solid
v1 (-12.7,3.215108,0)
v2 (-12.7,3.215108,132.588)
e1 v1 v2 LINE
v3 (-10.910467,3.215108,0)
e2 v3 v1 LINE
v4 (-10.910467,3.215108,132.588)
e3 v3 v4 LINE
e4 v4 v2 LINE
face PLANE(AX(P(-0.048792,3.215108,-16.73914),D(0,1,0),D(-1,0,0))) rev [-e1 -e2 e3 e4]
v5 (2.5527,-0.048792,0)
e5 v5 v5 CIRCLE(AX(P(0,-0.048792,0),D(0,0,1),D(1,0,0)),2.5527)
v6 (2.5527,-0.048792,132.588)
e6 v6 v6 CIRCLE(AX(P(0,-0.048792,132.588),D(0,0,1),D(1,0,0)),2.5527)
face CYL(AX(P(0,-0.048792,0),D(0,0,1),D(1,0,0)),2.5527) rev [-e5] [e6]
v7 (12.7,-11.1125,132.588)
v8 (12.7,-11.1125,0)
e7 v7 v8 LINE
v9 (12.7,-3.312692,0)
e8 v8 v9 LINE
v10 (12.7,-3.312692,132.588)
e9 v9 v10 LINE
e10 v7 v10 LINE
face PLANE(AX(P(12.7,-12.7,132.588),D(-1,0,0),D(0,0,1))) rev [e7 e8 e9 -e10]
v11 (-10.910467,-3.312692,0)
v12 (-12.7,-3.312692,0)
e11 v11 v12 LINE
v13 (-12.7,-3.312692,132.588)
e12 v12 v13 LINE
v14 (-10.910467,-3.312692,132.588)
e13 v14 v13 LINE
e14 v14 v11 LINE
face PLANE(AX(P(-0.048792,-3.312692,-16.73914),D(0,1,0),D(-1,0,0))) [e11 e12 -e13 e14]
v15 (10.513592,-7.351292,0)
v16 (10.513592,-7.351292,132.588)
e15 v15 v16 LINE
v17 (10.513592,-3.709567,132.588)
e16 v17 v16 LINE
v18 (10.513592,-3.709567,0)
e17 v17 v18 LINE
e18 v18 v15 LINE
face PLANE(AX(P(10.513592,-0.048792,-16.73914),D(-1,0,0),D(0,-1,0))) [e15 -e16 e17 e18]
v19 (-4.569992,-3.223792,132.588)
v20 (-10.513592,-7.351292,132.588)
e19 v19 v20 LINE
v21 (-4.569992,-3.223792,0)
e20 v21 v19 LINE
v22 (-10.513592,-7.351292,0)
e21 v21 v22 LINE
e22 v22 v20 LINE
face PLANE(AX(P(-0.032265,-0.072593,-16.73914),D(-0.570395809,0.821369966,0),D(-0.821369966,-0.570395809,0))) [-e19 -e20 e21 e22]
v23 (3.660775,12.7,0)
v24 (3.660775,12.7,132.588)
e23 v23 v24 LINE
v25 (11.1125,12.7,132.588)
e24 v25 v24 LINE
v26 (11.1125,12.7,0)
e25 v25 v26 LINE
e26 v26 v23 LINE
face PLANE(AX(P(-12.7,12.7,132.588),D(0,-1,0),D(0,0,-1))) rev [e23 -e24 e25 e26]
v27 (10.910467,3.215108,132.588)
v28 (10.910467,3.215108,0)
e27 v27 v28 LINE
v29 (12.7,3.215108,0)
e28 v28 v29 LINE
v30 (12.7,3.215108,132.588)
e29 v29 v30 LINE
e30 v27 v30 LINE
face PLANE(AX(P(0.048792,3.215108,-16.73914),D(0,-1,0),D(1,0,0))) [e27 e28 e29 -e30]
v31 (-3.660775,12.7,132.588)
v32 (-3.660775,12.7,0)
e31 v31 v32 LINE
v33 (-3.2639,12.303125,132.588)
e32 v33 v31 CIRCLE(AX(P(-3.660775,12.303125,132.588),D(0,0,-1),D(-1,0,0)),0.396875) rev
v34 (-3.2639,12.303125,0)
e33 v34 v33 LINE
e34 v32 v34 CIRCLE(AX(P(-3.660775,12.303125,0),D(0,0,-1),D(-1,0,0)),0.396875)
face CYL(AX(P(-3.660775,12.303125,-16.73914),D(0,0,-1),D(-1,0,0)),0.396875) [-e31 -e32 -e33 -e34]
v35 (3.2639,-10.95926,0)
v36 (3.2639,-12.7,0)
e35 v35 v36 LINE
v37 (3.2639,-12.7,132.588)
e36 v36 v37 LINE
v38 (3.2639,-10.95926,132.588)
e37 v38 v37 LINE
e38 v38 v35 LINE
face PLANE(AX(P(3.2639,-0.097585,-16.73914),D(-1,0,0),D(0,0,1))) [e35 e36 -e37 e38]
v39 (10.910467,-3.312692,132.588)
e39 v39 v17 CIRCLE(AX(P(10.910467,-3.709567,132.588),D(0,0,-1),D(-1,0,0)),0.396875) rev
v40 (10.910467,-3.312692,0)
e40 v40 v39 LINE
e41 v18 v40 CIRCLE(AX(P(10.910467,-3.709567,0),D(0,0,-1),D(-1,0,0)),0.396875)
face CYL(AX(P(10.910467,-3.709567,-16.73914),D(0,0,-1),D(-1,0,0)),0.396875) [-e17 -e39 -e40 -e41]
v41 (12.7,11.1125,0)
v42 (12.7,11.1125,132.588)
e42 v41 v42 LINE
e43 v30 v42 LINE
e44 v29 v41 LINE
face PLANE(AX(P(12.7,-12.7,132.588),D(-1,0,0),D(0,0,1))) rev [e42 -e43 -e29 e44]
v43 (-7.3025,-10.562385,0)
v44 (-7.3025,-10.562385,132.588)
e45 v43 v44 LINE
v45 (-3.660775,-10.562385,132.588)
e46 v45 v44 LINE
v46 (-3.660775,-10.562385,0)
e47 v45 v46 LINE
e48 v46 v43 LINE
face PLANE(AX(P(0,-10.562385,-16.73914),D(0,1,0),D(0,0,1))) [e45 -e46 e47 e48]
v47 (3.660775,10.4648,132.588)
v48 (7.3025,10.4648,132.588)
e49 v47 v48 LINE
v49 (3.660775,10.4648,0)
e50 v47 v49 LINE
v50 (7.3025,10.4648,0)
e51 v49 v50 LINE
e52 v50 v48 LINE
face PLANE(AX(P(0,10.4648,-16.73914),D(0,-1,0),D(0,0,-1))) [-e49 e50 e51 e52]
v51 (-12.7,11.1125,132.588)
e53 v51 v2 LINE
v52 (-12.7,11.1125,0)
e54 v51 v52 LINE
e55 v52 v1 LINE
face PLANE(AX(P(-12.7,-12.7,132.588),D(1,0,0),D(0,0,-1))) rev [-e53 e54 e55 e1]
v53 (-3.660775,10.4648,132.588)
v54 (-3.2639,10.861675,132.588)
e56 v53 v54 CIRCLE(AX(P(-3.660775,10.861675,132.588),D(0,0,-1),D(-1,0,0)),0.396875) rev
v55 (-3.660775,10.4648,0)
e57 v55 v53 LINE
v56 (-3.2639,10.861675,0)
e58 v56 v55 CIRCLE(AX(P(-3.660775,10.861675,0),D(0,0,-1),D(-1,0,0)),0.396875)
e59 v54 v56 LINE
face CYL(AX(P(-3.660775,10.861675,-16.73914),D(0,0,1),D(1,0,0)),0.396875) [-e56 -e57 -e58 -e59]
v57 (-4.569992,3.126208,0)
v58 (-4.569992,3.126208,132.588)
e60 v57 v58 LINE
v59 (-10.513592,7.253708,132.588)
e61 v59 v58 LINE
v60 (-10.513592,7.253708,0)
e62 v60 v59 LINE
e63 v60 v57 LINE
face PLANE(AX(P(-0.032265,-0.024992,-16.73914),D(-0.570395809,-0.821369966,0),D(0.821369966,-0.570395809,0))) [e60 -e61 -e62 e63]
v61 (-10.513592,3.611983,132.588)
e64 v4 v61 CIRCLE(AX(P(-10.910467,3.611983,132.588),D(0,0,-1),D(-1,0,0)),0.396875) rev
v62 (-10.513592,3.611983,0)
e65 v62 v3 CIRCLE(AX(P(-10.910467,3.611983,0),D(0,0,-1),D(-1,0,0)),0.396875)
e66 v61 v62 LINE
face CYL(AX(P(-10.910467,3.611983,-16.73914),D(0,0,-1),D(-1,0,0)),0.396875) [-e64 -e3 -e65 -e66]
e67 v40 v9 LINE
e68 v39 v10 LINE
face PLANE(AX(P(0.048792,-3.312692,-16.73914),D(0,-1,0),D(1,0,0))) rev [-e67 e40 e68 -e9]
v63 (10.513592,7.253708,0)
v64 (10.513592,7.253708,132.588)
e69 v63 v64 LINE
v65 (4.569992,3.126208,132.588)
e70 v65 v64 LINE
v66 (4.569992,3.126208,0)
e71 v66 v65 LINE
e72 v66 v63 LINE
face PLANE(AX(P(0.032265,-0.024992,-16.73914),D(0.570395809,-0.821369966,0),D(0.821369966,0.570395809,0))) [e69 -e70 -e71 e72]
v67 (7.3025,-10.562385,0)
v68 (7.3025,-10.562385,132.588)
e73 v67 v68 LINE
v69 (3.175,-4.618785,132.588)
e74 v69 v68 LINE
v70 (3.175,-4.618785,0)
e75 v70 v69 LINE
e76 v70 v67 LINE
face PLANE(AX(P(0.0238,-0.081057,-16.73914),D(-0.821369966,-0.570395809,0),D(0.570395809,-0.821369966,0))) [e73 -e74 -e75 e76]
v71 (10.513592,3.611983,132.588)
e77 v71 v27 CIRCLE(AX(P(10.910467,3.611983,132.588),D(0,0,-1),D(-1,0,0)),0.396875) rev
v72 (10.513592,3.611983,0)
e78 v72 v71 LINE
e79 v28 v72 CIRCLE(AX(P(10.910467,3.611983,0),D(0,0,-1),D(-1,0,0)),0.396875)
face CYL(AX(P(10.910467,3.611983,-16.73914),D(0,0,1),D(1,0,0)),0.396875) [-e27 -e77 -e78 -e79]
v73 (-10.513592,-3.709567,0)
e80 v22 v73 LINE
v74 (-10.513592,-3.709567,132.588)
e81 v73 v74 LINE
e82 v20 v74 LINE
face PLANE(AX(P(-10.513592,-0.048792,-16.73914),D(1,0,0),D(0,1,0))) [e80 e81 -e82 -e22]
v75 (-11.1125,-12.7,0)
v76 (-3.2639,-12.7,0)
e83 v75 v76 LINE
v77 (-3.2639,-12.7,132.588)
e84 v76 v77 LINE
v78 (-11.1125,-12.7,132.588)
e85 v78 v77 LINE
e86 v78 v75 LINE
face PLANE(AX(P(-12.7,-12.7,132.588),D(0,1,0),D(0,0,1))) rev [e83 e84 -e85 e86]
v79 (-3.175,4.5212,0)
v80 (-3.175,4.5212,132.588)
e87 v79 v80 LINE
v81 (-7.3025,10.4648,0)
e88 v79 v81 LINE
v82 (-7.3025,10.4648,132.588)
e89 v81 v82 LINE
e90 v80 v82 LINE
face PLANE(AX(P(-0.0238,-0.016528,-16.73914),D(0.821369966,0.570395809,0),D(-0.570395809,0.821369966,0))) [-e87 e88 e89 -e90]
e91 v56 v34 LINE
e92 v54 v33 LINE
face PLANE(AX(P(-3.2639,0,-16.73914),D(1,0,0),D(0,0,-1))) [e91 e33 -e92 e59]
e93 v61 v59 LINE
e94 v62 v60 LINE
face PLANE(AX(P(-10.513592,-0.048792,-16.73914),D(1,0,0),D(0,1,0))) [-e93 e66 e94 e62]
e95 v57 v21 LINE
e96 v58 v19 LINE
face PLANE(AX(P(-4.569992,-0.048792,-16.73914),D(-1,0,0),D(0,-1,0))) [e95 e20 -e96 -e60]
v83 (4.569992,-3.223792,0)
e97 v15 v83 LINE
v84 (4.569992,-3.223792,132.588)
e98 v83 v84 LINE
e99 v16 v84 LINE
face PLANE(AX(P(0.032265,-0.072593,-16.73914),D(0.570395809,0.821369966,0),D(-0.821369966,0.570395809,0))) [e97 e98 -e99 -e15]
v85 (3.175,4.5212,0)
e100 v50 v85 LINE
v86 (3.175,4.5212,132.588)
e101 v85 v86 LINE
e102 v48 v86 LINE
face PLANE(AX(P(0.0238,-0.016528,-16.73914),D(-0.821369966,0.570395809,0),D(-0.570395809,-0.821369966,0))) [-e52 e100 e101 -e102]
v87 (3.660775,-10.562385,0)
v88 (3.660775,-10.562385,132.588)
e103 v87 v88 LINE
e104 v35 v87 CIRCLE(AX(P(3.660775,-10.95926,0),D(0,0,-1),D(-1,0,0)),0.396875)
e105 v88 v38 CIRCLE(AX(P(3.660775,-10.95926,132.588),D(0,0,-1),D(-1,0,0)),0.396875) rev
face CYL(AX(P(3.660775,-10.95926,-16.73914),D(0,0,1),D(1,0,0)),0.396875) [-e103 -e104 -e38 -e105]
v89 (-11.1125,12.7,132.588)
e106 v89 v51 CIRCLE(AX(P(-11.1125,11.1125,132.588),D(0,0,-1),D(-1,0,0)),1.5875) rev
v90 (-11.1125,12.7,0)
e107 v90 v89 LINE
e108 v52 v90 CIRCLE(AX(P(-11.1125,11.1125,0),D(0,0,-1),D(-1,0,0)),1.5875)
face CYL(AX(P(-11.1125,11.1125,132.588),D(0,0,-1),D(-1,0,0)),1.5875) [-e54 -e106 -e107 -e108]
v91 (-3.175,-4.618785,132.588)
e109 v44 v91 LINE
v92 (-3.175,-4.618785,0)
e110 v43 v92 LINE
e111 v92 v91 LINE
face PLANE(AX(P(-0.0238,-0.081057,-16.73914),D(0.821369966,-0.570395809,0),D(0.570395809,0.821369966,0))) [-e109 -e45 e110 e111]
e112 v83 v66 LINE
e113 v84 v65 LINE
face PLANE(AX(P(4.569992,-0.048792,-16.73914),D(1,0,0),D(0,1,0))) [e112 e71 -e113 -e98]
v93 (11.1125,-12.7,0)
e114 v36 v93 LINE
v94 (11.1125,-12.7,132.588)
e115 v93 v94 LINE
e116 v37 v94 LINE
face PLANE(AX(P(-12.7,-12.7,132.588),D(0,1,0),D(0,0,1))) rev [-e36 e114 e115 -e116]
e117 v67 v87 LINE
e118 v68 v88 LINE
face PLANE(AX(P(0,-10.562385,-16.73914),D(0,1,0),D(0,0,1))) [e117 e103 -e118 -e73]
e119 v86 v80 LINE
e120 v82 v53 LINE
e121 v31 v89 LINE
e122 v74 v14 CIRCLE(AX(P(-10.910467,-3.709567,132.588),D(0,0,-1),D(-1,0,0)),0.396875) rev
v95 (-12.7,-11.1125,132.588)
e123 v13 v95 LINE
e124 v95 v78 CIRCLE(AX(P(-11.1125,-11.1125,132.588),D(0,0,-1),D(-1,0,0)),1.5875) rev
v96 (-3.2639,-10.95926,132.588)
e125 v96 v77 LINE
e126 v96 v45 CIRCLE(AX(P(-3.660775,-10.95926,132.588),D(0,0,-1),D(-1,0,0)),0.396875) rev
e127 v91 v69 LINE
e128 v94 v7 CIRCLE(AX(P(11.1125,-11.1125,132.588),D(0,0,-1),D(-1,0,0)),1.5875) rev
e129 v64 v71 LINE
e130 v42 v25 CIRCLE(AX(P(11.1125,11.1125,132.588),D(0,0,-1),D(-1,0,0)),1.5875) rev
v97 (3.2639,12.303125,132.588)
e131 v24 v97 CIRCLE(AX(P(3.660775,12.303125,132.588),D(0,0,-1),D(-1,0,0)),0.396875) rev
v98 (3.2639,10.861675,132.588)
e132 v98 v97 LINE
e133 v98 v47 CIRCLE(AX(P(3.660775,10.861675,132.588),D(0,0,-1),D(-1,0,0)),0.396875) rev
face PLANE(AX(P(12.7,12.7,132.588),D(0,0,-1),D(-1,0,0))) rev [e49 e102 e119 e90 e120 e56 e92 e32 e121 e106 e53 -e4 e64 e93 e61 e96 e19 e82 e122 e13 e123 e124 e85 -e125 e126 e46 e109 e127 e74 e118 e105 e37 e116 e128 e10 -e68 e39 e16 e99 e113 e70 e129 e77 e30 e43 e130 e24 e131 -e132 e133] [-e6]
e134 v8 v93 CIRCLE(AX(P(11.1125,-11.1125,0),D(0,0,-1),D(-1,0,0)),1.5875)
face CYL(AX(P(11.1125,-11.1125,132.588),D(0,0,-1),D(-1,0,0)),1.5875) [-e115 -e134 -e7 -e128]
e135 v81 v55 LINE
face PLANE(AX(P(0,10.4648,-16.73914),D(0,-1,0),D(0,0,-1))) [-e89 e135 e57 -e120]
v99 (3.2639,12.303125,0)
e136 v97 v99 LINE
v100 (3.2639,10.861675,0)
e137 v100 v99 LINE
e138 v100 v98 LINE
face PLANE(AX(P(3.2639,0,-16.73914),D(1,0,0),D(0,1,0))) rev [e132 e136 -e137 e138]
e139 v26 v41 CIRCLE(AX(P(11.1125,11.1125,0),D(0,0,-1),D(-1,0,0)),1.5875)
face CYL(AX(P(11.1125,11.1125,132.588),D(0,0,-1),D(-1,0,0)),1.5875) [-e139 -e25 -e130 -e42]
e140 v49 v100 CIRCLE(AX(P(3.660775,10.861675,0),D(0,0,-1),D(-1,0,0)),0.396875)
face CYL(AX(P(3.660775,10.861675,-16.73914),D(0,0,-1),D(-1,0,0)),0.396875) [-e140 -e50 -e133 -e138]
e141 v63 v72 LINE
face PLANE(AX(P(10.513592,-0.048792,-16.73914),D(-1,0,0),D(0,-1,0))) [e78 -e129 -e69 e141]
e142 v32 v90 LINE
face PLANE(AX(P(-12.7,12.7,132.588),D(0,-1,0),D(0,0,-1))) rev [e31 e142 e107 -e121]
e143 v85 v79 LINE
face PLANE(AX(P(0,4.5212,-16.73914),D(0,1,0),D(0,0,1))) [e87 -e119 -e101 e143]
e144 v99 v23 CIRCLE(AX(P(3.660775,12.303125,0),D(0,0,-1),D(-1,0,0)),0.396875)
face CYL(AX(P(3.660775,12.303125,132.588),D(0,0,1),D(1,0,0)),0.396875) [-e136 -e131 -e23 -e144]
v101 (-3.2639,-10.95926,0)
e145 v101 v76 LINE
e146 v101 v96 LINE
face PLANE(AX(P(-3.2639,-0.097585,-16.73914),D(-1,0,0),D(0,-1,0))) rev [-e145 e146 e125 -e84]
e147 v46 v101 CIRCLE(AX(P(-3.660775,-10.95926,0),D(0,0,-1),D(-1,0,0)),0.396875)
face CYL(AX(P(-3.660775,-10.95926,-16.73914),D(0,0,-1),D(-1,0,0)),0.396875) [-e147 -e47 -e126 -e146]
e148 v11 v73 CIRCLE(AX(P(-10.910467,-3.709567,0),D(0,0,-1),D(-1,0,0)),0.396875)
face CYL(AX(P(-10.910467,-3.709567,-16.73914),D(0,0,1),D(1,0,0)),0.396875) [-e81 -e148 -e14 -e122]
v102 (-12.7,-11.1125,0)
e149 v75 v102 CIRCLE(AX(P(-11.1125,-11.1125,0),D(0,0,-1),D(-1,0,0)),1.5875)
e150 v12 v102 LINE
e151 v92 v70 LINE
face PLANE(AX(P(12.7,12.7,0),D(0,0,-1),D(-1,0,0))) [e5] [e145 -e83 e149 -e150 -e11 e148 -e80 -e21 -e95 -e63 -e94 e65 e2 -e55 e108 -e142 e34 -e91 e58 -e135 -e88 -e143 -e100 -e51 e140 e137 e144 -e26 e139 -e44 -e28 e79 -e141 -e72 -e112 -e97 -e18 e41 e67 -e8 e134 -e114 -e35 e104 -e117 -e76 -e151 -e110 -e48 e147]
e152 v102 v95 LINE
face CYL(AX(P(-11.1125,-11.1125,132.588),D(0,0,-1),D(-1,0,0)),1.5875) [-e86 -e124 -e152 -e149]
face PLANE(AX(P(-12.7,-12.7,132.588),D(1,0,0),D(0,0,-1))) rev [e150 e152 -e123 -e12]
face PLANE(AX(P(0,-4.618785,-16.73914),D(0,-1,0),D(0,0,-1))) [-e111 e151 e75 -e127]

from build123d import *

# Parameters (mm, degrees)
SKETCH1_W           = 25.4
SKETCH1_H           = 25.4
BOSS_EXTRUDE1_DEPTH = 132.588
FILLET1_R           = 1.5875
HOLE1_OUTLINE_R     = 2.5527
HOLE1_DEPTH         = 132.588
SKETCH7_W           = 6.5278
SKETCH7_H           = 2.2352
CUT_EXTRUDE2_DEPTH  = 132.588
FILLET4_R           = 0.396875
CIRPATTERN2_DEPTH   = 132.588


# Read off the part's stored shape, not the designer's step: Hole1, CirPattern2
with BuildPart() as part:
    # Sketch1 → Boss-Extrude1 (new body)
    with BuildSketch(Plane.XY):
        Rectangle(SKETCH1_W, SKETCH1_H)
    extrude(amount=BOSS_EXTRUDE1_DEPTH)

    # Fillet1
    fillet1_edges = [part.edges().sort_by_distance(p)[0] for p in [
        (12.7, -12.7, 66.294),
        (-12.7, -12.7, 66.294),
        (-12.7, 12.7, 66.294),
        (12.7, 12.7, 66.294),
    ]]
    fillet(fillet1_edges, radius=FILLET1_R)

    # Hole1 outline → Hole1 (cut)
    with BuildSketch(Plane.XY):
        with Locations((0, -0.048792482)):
            Circle(HOLE1_OUTLINE_R)
    extrude(amount=HOLE1_DEPTH, mode=Mode.SUBTRACT)

    # Sketch7 → Cut-Extrude2 (cut)
    with BuildSketch(Plane.XY.offset(132.588)):
        with Locations((0, 11.5824)):
            Rectangle(SKETCH7_W, SKETCH7_H)
        Polygon((-3.175, 4.5212), (-7.3025, 10.4648), (7.3025, 10.4648), (3.175, 4.5212), align=None)
    extrude(amount=-CUT_EXTRUDE2_DEPTH, mode=Mode.SUBTRACT)

    # Fillet4
    fillet4_edges = [part.edges().sort_by_distance(p)[0] for p in [
        (-3.2639, 10.4648, 66.294),
        (-3.2639, 12.7, 66.294),
        (3.2639, 12.7, 66.294),
        (3.2639, 10.4648, 66.294),
    ]]
    fillet(fillet4_edges, radius=FILLET4_R)

    # CirPattern2 outline → CirPattern2 (cut)
    with BuildSketch(Plane.XY):
        with BuildLine():
            ThreePointArc((-3.660775, -10.562384964), (-3.380141996, -10.67862696), (-3.2639, -10.959259964))
            Line((-3.2639, -10.959259964), (-3.2639, -12.7))
            Line((-3.2639, -12.7), (3.2639, -12.7))
            Line((3.2639, -12.7), (3.2639, -10.959259964))
            ThreePointArc((3.2639, -10.959259964), (3.380141996, -10.67862696), (3.660775, -10.562384964))
            Line((3.660775, -10.562384964), (7.3025, -10.562384964))
            Line((7.3025, -10.562384964), (3.175, -4.618784964))
            Line((3.175, -4.618784964), (-3.175, -4.618784964))
            Line((-3.175, -4.618784964), (-7.3025, -10.562384964))
            Line((-7.3025, -10.562384964), (-3.660775, -10.562384964))
        make_face()
        with BuildLine():
            Line((-12.7, -3.312692482), (-10.910467482, -3.312692482))
            ThreePointArc((-10.910467482, -3.312692482), (-10.629834478, -3.428934478), (-10.513592482, -3.709567482))
            Line((-10.513592482, -3.709567482), (-10.513592482, -7.351292482))
            Line((-10.513592482, -7.351292482), (-4.569992482, -3.223792482))
            Line((-4.569992482, -3.223792482), (-4.569992482, 3.126207518))
            Line((-4.569992482, 3.126207518), (-10.513592482, 7.253707518))
            Line((-10.513592482, 7.253707518), (-10.513592482, 3.611982518))
            ThreePointArc((-10.513592482, 3.611982518), (-10.629834478, 3.331349514), (-10.910467482, 3.215107518))
            Line((-10.910467482, 3.215107518), (-12.7, 3.215107518))
            Line((-12.7, 3.215107518), (-12.7, -3.312692482))
        make_face()
        with BuildLine():
            ThreePointArc((10.513592482, -3.709567482), (10.629834478, -3.428934478), (10.910467482, -3.312692482))
            Line((10.910467482, -3.312692482), (12.7, -3.312692482))
            Line((12.7, -3.312692482), (12.7, 3.215107518))
            Line((12.7, 3.215107518), (10.910467482, 3.215107518))
            ThreePointArc((10.910467482, 3.215107518), (10.629834478, 3.331349514), (10.513592482, 3.611982518))
            Line((10.513592482, 3.611982518), (10.513592482, 7.253707518))
            Line((10.513592482, 7.253707518), (4.569992482, 3.126207518))
            Line((4.569992482, 3.126207518), (4.569992482, -3.223792482))
            Line((4.569992482, -3.223792482), (10.513592482, -7.351292482))
            Line((10.513592482, -7.351292482), (10.513592482, -3.709567482))
        make_face()
    extrude(amount=CIRPATTERN2_DEPTH, mode=Mode.SUBTRACT)


solid = part.part
